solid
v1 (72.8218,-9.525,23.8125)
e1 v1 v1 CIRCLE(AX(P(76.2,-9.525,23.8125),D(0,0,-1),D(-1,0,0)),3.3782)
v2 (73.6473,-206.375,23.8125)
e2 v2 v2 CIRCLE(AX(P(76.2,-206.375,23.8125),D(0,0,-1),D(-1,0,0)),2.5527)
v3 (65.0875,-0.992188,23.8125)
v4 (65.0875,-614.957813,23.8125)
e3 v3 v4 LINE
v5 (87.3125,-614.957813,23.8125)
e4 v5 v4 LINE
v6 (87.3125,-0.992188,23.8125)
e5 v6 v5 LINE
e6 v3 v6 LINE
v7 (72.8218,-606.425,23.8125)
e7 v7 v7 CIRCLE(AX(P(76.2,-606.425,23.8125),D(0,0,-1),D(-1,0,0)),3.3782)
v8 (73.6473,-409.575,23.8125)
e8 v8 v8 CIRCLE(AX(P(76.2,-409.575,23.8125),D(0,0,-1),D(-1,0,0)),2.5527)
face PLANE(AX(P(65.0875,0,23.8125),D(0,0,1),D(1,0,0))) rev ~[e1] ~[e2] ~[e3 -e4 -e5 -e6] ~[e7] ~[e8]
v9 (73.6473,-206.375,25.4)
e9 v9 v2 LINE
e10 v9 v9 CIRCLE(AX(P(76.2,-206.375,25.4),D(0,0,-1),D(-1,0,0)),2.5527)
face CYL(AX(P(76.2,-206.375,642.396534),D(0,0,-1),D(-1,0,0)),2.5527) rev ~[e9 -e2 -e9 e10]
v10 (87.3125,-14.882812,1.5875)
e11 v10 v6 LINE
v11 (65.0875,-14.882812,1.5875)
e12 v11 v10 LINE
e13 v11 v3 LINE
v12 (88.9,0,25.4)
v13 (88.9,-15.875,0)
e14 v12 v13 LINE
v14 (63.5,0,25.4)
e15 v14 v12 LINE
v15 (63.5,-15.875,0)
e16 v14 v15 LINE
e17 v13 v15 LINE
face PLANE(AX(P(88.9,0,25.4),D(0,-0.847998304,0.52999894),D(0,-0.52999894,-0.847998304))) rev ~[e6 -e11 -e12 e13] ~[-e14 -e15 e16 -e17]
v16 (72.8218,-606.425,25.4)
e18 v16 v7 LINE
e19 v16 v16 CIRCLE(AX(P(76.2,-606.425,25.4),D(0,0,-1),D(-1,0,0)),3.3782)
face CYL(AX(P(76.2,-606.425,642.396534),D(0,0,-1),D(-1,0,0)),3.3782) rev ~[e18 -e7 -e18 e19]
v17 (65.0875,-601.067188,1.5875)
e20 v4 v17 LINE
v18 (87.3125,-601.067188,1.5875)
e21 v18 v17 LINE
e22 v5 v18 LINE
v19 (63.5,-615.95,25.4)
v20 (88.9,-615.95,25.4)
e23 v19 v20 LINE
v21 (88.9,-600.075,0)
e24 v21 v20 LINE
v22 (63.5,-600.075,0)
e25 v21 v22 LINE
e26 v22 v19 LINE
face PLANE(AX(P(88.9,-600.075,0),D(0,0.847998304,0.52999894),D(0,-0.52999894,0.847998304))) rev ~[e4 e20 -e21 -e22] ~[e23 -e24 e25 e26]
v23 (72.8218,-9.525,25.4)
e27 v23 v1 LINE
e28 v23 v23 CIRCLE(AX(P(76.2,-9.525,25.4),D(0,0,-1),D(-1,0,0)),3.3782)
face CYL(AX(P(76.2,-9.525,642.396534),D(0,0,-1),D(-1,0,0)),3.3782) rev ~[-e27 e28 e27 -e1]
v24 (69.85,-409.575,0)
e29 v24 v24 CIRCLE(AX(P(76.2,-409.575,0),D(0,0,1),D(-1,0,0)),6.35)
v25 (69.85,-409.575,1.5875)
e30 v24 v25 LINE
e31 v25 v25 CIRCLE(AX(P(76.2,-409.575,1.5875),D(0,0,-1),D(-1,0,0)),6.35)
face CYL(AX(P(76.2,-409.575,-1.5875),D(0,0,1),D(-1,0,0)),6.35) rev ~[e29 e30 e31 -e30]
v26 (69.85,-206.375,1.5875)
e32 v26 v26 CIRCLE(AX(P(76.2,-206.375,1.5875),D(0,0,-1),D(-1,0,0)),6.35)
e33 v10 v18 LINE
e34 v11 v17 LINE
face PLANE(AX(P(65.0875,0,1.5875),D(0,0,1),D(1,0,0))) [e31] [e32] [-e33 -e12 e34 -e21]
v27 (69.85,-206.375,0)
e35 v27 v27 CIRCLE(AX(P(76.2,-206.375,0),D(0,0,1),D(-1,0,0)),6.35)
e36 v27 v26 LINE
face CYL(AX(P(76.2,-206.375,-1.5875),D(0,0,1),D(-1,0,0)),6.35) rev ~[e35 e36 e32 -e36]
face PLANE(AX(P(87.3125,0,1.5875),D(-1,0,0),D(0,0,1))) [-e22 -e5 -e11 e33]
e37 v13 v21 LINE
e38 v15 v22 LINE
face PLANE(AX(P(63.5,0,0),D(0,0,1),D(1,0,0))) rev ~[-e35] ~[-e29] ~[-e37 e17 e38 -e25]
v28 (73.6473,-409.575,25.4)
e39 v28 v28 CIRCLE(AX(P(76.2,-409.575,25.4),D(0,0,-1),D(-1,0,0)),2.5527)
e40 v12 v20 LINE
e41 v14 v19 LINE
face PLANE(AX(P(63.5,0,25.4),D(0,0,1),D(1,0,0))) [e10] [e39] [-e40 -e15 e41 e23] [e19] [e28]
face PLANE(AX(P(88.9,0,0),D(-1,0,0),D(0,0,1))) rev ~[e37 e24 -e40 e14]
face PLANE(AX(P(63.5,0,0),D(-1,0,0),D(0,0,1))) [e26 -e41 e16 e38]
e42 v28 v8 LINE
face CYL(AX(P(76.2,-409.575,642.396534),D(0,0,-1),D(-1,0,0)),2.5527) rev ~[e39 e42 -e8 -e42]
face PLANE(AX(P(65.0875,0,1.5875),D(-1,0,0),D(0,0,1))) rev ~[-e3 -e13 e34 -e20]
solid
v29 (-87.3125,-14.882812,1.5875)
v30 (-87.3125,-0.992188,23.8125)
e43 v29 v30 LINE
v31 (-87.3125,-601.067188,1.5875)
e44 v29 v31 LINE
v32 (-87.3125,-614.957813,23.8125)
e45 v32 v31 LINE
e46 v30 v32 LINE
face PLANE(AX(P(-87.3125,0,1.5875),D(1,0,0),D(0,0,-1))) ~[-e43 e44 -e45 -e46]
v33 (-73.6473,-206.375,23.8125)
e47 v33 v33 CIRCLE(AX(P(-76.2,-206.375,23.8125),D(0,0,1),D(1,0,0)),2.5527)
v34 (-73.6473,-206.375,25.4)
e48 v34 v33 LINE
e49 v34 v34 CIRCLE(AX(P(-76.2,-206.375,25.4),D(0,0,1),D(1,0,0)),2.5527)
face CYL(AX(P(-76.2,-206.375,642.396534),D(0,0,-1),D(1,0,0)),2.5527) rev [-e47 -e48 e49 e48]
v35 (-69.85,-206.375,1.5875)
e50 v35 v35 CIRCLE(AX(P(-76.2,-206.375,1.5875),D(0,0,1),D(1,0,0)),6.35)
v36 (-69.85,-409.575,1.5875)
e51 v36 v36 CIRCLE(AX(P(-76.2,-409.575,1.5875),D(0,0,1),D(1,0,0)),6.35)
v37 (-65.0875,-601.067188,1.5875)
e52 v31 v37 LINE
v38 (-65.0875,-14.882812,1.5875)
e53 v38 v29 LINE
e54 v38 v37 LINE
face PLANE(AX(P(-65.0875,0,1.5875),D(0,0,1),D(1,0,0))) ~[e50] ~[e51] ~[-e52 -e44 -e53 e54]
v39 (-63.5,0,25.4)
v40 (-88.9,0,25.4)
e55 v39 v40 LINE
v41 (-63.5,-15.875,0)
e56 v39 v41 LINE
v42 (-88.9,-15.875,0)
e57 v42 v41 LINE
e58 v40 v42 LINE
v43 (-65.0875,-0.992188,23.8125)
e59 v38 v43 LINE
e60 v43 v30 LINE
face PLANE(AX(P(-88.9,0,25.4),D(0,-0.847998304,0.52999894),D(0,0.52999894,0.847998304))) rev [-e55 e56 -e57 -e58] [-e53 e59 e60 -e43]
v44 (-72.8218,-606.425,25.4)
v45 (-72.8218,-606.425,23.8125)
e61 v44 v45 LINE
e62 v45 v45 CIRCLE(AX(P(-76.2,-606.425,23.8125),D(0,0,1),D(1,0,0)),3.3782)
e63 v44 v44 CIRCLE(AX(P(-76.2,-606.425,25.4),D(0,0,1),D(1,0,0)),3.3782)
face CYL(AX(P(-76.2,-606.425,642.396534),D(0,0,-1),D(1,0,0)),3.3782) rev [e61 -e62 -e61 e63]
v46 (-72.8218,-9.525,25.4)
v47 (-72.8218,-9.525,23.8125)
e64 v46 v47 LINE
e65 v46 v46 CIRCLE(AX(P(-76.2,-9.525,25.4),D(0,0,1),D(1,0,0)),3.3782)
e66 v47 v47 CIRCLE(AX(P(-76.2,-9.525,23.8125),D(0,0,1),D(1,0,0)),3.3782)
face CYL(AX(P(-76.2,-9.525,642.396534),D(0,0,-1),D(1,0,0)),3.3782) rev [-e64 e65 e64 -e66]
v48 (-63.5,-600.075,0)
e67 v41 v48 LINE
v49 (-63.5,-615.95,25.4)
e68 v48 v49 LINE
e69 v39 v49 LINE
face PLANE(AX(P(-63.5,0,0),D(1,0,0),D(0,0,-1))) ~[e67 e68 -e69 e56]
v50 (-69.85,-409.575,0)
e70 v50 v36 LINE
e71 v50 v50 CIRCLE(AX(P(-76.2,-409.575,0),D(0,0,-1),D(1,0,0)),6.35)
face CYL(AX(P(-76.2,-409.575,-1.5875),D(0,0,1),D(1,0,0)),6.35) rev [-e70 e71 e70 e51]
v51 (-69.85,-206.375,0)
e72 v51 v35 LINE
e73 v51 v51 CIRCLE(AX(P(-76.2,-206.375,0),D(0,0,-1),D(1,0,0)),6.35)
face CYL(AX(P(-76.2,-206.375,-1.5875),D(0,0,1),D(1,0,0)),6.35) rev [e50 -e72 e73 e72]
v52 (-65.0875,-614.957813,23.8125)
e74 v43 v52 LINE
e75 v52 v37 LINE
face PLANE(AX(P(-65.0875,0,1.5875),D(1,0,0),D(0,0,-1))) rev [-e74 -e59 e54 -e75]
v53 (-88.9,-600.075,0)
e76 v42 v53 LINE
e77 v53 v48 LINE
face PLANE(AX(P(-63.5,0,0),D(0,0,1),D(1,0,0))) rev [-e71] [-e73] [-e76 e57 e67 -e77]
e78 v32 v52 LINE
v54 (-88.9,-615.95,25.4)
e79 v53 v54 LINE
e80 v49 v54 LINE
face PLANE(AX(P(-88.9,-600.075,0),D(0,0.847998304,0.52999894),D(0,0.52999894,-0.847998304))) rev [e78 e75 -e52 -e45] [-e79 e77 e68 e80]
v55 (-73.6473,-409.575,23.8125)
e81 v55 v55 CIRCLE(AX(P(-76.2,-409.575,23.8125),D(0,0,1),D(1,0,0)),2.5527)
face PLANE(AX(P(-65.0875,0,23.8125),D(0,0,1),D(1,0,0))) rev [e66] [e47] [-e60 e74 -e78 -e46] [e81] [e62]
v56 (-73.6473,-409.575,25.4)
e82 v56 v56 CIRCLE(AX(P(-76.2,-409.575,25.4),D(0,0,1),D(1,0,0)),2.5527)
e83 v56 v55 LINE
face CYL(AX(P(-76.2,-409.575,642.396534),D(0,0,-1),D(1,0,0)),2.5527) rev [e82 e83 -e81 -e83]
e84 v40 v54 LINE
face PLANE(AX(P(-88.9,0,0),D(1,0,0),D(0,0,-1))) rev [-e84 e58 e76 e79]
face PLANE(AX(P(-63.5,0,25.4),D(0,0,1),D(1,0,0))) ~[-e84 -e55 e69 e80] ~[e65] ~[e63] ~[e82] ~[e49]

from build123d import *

# Parameters (mm, degrees)
F0_W     = 25.4
F0_H     = 25.4
F0_W_2   = 22.225
F0_H_2   = 22.225
F1_DEPTH = 615.95
F3_D     = 5.1054
F5_DEPTH = 25.4
F7_D     = 12.7
F7_DEPTH = 1.5875
F7_TIP   = 3.8154649308
F9_D     = 6.7564


# Not quite as in the source:
# - a length typed as a fraction of an inch, garbled in the dataset ("3 / 203.2 mm" for 3/8 in), is restored
# - a feature names something its author has since deleted; it is built from what else it names


with BuildPart() as f1:
    # F0 (on Front) → F1 (new body)
    with BuildSketch(Plane.XZ):
        with Locations((76.2, 12.7)):
            Rectangle(F0_W, F0_H)
        with Locations((76.2, 12.7)):
            Rectangle(F0_W_2, F0_H_2, mode=Mode.SUBTRACT)
    extrude(amount=F1_DEPTH)

    # F3 (through all)
    with Locations(Plane.XY.offset(25.4)):
        with Locations((76.2, -206.375), (76.2, -409.575)):
            Hole(F3_D / 2)

    # F4 (on face) → F5 (cut)
    with BuildSketch(Plane.YZ.offset(88.9)):
        Polygon((0, 0), (0, 25.4), (-15.875, 0), align=None)
        Polygon((-600.075, 0), (-615.95, 25.4), (-615.95, 0), align=None)
    extrude(amount=-F5_DEPTH, mode=Mode.SUBTRACT)

    # F7
    with Locations(Plane(origin=(0, 0, 0), x_dir=(1, 0, 0), z_dir=(0, 0, -1))):
        with Locations((76.2, 409.575), (76.2, 206.375)):
            Hole(F7_D / 2, depth=F7_DEPTH)
            with Locations((0, 0, -(F7_DEPTH + F7_TIP / 2))):  # 118° drill point
                Cone(0, F7_D / 2, F7_TIP, mode=Mode.SUBTRACT)

    # F9 (through all)
    with Locations(Plane.XY.offset(25.4)):
        with Locations((76.2, -606.425), (76.2, -9.525)):
            Hole(F9_D / 2)


with BuildPart() as f10_1:
    # F10: instance of F1
    add(f1.part.mirror(Plane.YZ))


solid = Compound([f1.part, f10_1.part])
